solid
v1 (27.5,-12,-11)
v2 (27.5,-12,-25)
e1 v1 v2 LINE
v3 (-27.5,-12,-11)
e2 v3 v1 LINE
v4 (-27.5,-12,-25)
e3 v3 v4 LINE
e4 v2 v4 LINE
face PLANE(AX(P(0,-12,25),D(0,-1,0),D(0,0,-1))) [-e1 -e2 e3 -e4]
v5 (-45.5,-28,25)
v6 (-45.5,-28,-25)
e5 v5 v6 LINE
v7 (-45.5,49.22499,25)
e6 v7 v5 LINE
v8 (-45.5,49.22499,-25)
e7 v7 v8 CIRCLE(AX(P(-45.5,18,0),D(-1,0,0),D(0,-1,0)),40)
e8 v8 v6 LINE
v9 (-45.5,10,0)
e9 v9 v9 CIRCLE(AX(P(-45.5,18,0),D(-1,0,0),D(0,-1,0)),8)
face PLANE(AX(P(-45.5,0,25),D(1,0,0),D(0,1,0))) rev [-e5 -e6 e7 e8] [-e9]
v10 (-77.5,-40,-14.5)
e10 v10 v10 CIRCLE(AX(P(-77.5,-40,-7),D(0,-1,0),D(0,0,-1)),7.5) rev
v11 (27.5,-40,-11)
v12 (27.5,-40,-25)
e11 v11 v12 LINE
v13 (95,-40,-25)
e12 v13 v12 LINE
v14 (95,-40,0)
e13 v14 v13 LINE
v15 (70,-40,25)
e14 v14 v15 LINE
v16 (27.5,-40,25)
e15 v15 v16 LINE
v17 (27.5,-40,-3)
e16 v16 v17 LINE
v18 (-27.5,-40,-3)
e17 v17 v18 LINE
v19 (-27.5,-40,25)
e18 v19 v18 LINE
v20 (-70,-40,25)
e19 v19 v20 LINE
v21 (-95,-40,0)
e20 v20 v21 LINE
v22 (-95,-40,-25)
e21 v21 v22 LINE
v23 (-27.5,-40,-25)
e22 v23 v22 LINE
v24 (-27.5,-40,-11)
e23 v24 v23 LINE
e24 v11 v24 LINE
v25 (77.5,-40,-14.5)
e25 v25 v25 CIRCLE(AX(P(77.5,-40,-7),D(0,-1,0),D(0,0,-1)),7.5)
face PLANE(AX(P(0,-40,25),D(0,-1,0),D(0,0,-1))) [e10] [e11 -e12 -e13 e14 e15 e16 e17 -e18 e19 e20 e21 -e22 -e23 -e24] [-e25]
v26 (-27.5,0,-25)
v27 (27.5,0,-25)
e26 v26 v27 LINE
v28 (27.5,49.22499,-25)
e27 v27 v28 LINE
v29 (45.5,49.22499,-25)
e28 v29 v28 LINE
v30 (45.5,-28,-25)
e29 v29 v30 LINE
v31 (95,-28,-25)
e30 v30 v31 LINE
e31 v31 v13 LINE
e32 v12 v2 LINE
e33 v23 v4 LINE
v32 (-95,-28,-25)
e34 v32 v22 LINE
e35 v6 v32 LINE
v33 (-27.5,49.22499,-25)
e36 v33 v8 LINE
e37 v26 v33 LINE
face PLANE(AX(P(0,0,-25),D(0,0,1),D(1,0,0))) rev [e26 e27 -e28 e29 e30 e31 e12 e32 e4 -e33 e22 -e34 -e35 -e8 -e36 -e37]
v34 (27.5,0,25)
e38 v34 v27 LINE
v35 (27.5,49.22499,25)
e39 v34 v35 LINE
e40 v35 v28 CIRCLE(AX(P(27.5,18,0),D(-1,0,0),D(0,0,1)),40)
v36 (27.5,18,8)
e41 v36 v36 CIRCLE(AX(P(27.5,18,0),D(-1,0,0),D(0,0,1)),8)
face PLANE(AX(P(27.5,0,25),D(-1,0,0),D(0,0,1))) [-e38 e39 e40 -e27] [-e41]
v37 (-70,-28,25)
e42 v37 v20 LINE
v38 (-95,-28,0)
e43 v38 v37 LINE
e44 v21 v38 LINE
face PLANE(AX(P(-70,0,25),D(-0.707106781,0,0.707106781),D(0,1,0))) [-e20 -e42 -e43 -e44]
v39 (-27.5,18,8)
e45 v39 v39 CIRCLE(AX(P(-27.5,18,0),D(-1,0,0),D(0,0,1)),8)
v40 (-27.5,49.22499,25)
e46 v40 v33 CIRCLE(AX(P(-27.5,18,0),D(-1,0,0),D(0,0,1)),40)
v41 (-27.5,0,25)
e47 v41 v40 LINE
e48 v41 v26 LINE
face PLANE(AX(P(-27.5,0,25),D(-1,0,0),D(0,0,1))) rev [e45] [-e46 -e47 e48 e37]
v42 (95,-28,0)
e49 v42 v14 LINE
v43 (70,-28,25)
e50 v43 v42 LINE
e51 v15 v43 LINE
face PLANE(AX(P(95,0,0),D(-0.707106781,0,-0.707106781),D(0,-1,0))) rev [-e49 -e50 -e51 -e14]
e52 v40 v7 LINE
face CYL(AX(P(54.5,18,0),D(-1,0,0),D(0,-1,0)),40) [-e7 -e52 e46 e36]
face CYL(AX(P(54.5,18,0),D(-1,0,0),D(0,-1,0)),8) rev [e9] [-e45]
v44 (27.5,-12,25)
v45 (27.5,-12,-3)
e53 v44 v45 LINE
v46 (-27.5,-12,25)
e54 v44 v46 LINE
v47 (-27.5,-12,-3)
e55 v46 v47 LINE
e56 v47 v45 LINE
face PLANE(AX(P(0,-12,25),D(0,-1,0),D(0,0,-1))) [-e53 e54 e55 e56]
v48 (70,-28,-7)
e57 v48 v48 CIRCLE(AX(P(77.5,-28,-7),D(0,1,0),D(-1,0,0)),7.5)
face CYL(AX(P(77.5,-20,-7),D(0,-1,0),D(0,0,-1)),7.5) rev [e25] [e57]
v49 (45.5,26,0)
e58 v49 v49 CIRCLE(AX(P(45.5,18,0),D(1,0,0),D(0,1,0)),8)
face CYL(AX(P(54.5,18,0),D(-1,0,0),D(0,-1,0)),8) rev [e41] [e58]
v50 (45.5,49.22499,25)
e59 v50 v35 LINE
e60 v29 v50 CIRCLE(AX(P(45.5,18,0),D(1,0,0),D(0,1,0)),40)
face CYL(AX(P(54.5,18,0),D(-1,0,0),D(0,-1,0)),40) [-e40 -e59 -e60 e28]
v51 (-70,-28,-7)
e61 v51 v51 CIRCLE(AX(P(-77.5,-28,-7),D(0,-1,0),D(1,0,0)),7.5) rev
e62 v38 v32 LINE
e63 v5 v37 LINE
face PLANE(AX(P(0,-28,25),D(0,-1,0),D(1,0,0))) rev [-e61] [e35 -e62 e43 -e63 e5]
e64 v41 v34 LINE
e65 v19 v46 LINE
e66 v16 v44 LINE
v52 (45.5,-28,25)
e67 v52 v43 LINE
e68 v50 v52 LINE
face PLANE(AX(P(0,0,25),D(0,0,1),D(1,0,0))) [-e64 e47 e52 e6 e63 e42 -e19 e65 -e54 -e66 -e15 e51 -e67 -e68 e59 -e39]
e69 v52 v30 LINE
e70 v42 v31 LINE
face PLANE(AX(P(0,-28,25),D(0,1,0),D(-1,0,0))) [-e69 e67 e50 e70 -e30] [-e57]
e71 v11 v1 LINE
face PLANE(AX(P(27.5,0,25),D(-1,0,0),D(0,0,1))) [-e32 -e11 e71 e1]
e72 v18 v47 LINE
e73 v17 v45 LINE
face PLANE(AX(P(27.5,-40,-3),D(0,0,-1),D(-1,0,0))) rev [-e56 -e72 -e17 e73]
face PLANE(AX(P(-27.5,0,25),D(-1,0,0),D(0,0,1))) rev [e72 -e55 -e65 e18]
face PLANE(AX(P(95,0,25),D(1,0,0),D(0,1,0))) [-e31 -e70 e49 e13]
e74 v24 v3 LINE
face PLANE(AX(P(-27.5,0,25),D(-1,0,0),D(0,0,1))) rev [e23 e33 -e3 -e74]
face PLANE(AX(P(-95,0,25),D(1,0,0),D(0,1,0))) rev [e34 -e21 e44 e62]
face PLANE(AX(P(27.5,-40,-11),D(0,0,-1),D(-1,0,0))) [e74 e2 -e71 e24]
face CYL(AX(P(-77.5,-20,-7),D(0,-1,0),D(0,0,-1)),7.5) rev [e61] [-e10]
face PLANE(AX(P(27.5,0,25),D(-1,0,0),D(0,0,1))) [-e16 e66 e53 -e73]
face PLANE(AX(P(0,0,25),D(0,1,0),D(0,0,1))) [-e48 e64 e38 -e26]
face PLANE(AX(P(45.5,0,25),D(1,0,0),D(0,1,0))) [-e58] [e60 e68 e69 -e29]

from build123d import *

# Parameters (mm, degrees)
BOSS_EXTRUDE1_DEPTH = 25
RIB1_START          = -28
RIB1_OUTLINE_W      = 55
RIB1_OUTLINE_H      = 8
RIB1_DEPTH          = 28
CUT_EXTRUDE1_DEPTH  = 100
SKETCH2_5_R         = 7.5
CUT_EXTRUDE2_DEPTH  = 20
CHAMFER2_SIZE       = 25


# Read off the part's stored shape, not the designer's step: Rib1
with BuildPart() as part:
    # Sketch1 → Boss-Extrude1 (new, symmetric)
    with BuildSketch(Plane.XY):
        Polygon((27.5, 0), (0, 0), (0, -12), (27.5, -12), (27.5, -40), (95, -40), (95, -28), (45.5, -28), (45.5, 58), (27.5, 58), align=None)
        Polygon((0, -12), (0, 0), (-27.5, 0), (-27.5, 58), (-45.5, 58), (-45.5, -28), (-95, -28), (-95, -40), (-27.5, -40), (-27.5, -12), align=None)
    extrude(amount=BOSS_EXTRUDE1_DEPTH, both=True)

    # Rib1 outline → Rib1 (add)
    with BuildSketch(Plane.XZ.offset(40).offset(RIB1_START)):
        with Locations((0, -7)):
            Rectangle(RIB1_OUTLINE_W, RIB1_OUTLINE_H)
    extrude(amount=RIB1_DEPTH)

    # Sketch4 → Cut-Extrude1 (cut)
    with BuildSketch(Plane.ZY.offset(45.5)):
        with BuildLine():
            ThreePointArc((8, 18), (5.656854249, 23.656854249), (0, 26))
            Line((0, 26), (0, 10))
            ThreePointArc((0, 10), (5.656854249, 12.343145751), (8, 18))
        make_face()
        with BuildLine():
            Line((0, 10), (0, 26))
            ThreePointArc((0, 26), (-8, 18), (0, 10))
        make_face()
        with BuildLine():
            Line((25, 49.224989992), (25, 58))
            Line((25, 58), (-1.3e-08, 58))
            ThreePointArc((-1.3e-08, 58), (13.247648848, 55.742546284), (25, 49.224989992))
        make_face()
        with BuildLine():
            ThreePointArc((-25, 49.224989992), (-13.24764886, 55.74254628), (-1.3e-08, 58))
            Line((-1.3e-08, 58), (-25, 58))
            Line((-25, 58), (-25, 49.224989992))
        make_face()
    extrude(amount=-CUT_EXTRUDE1_DEPTH, mode=Mode.SUBTRACT)

    # Sketch2<5> → Cut-Extrude2 (cut)
    with BuildSketch(Plane.XZ.offset(40)):
        with Locations(Location((-77.5, -7, 0), (0, 0, 270))):
            Circle(SKETCH2_5_R)
        with Locations(Location((77.5, -7, 0), (0, 0, 270))):
            Circle(SKETCH2_5_R)
    extrude(amount=-CUT_EXTRUDE2_DEPTH, mode=Mode.SUBTRACT)

    # Chamfer2
    chamfer2_edges = [part.edges().sort_by_distance(p)[0] for p in [
        (-95, -34, 25),
        (95, -34, 25),
    ]]
    chamfer(chamfer2_edges, length=CHAMFER2_SIZE)


solid = part.part
